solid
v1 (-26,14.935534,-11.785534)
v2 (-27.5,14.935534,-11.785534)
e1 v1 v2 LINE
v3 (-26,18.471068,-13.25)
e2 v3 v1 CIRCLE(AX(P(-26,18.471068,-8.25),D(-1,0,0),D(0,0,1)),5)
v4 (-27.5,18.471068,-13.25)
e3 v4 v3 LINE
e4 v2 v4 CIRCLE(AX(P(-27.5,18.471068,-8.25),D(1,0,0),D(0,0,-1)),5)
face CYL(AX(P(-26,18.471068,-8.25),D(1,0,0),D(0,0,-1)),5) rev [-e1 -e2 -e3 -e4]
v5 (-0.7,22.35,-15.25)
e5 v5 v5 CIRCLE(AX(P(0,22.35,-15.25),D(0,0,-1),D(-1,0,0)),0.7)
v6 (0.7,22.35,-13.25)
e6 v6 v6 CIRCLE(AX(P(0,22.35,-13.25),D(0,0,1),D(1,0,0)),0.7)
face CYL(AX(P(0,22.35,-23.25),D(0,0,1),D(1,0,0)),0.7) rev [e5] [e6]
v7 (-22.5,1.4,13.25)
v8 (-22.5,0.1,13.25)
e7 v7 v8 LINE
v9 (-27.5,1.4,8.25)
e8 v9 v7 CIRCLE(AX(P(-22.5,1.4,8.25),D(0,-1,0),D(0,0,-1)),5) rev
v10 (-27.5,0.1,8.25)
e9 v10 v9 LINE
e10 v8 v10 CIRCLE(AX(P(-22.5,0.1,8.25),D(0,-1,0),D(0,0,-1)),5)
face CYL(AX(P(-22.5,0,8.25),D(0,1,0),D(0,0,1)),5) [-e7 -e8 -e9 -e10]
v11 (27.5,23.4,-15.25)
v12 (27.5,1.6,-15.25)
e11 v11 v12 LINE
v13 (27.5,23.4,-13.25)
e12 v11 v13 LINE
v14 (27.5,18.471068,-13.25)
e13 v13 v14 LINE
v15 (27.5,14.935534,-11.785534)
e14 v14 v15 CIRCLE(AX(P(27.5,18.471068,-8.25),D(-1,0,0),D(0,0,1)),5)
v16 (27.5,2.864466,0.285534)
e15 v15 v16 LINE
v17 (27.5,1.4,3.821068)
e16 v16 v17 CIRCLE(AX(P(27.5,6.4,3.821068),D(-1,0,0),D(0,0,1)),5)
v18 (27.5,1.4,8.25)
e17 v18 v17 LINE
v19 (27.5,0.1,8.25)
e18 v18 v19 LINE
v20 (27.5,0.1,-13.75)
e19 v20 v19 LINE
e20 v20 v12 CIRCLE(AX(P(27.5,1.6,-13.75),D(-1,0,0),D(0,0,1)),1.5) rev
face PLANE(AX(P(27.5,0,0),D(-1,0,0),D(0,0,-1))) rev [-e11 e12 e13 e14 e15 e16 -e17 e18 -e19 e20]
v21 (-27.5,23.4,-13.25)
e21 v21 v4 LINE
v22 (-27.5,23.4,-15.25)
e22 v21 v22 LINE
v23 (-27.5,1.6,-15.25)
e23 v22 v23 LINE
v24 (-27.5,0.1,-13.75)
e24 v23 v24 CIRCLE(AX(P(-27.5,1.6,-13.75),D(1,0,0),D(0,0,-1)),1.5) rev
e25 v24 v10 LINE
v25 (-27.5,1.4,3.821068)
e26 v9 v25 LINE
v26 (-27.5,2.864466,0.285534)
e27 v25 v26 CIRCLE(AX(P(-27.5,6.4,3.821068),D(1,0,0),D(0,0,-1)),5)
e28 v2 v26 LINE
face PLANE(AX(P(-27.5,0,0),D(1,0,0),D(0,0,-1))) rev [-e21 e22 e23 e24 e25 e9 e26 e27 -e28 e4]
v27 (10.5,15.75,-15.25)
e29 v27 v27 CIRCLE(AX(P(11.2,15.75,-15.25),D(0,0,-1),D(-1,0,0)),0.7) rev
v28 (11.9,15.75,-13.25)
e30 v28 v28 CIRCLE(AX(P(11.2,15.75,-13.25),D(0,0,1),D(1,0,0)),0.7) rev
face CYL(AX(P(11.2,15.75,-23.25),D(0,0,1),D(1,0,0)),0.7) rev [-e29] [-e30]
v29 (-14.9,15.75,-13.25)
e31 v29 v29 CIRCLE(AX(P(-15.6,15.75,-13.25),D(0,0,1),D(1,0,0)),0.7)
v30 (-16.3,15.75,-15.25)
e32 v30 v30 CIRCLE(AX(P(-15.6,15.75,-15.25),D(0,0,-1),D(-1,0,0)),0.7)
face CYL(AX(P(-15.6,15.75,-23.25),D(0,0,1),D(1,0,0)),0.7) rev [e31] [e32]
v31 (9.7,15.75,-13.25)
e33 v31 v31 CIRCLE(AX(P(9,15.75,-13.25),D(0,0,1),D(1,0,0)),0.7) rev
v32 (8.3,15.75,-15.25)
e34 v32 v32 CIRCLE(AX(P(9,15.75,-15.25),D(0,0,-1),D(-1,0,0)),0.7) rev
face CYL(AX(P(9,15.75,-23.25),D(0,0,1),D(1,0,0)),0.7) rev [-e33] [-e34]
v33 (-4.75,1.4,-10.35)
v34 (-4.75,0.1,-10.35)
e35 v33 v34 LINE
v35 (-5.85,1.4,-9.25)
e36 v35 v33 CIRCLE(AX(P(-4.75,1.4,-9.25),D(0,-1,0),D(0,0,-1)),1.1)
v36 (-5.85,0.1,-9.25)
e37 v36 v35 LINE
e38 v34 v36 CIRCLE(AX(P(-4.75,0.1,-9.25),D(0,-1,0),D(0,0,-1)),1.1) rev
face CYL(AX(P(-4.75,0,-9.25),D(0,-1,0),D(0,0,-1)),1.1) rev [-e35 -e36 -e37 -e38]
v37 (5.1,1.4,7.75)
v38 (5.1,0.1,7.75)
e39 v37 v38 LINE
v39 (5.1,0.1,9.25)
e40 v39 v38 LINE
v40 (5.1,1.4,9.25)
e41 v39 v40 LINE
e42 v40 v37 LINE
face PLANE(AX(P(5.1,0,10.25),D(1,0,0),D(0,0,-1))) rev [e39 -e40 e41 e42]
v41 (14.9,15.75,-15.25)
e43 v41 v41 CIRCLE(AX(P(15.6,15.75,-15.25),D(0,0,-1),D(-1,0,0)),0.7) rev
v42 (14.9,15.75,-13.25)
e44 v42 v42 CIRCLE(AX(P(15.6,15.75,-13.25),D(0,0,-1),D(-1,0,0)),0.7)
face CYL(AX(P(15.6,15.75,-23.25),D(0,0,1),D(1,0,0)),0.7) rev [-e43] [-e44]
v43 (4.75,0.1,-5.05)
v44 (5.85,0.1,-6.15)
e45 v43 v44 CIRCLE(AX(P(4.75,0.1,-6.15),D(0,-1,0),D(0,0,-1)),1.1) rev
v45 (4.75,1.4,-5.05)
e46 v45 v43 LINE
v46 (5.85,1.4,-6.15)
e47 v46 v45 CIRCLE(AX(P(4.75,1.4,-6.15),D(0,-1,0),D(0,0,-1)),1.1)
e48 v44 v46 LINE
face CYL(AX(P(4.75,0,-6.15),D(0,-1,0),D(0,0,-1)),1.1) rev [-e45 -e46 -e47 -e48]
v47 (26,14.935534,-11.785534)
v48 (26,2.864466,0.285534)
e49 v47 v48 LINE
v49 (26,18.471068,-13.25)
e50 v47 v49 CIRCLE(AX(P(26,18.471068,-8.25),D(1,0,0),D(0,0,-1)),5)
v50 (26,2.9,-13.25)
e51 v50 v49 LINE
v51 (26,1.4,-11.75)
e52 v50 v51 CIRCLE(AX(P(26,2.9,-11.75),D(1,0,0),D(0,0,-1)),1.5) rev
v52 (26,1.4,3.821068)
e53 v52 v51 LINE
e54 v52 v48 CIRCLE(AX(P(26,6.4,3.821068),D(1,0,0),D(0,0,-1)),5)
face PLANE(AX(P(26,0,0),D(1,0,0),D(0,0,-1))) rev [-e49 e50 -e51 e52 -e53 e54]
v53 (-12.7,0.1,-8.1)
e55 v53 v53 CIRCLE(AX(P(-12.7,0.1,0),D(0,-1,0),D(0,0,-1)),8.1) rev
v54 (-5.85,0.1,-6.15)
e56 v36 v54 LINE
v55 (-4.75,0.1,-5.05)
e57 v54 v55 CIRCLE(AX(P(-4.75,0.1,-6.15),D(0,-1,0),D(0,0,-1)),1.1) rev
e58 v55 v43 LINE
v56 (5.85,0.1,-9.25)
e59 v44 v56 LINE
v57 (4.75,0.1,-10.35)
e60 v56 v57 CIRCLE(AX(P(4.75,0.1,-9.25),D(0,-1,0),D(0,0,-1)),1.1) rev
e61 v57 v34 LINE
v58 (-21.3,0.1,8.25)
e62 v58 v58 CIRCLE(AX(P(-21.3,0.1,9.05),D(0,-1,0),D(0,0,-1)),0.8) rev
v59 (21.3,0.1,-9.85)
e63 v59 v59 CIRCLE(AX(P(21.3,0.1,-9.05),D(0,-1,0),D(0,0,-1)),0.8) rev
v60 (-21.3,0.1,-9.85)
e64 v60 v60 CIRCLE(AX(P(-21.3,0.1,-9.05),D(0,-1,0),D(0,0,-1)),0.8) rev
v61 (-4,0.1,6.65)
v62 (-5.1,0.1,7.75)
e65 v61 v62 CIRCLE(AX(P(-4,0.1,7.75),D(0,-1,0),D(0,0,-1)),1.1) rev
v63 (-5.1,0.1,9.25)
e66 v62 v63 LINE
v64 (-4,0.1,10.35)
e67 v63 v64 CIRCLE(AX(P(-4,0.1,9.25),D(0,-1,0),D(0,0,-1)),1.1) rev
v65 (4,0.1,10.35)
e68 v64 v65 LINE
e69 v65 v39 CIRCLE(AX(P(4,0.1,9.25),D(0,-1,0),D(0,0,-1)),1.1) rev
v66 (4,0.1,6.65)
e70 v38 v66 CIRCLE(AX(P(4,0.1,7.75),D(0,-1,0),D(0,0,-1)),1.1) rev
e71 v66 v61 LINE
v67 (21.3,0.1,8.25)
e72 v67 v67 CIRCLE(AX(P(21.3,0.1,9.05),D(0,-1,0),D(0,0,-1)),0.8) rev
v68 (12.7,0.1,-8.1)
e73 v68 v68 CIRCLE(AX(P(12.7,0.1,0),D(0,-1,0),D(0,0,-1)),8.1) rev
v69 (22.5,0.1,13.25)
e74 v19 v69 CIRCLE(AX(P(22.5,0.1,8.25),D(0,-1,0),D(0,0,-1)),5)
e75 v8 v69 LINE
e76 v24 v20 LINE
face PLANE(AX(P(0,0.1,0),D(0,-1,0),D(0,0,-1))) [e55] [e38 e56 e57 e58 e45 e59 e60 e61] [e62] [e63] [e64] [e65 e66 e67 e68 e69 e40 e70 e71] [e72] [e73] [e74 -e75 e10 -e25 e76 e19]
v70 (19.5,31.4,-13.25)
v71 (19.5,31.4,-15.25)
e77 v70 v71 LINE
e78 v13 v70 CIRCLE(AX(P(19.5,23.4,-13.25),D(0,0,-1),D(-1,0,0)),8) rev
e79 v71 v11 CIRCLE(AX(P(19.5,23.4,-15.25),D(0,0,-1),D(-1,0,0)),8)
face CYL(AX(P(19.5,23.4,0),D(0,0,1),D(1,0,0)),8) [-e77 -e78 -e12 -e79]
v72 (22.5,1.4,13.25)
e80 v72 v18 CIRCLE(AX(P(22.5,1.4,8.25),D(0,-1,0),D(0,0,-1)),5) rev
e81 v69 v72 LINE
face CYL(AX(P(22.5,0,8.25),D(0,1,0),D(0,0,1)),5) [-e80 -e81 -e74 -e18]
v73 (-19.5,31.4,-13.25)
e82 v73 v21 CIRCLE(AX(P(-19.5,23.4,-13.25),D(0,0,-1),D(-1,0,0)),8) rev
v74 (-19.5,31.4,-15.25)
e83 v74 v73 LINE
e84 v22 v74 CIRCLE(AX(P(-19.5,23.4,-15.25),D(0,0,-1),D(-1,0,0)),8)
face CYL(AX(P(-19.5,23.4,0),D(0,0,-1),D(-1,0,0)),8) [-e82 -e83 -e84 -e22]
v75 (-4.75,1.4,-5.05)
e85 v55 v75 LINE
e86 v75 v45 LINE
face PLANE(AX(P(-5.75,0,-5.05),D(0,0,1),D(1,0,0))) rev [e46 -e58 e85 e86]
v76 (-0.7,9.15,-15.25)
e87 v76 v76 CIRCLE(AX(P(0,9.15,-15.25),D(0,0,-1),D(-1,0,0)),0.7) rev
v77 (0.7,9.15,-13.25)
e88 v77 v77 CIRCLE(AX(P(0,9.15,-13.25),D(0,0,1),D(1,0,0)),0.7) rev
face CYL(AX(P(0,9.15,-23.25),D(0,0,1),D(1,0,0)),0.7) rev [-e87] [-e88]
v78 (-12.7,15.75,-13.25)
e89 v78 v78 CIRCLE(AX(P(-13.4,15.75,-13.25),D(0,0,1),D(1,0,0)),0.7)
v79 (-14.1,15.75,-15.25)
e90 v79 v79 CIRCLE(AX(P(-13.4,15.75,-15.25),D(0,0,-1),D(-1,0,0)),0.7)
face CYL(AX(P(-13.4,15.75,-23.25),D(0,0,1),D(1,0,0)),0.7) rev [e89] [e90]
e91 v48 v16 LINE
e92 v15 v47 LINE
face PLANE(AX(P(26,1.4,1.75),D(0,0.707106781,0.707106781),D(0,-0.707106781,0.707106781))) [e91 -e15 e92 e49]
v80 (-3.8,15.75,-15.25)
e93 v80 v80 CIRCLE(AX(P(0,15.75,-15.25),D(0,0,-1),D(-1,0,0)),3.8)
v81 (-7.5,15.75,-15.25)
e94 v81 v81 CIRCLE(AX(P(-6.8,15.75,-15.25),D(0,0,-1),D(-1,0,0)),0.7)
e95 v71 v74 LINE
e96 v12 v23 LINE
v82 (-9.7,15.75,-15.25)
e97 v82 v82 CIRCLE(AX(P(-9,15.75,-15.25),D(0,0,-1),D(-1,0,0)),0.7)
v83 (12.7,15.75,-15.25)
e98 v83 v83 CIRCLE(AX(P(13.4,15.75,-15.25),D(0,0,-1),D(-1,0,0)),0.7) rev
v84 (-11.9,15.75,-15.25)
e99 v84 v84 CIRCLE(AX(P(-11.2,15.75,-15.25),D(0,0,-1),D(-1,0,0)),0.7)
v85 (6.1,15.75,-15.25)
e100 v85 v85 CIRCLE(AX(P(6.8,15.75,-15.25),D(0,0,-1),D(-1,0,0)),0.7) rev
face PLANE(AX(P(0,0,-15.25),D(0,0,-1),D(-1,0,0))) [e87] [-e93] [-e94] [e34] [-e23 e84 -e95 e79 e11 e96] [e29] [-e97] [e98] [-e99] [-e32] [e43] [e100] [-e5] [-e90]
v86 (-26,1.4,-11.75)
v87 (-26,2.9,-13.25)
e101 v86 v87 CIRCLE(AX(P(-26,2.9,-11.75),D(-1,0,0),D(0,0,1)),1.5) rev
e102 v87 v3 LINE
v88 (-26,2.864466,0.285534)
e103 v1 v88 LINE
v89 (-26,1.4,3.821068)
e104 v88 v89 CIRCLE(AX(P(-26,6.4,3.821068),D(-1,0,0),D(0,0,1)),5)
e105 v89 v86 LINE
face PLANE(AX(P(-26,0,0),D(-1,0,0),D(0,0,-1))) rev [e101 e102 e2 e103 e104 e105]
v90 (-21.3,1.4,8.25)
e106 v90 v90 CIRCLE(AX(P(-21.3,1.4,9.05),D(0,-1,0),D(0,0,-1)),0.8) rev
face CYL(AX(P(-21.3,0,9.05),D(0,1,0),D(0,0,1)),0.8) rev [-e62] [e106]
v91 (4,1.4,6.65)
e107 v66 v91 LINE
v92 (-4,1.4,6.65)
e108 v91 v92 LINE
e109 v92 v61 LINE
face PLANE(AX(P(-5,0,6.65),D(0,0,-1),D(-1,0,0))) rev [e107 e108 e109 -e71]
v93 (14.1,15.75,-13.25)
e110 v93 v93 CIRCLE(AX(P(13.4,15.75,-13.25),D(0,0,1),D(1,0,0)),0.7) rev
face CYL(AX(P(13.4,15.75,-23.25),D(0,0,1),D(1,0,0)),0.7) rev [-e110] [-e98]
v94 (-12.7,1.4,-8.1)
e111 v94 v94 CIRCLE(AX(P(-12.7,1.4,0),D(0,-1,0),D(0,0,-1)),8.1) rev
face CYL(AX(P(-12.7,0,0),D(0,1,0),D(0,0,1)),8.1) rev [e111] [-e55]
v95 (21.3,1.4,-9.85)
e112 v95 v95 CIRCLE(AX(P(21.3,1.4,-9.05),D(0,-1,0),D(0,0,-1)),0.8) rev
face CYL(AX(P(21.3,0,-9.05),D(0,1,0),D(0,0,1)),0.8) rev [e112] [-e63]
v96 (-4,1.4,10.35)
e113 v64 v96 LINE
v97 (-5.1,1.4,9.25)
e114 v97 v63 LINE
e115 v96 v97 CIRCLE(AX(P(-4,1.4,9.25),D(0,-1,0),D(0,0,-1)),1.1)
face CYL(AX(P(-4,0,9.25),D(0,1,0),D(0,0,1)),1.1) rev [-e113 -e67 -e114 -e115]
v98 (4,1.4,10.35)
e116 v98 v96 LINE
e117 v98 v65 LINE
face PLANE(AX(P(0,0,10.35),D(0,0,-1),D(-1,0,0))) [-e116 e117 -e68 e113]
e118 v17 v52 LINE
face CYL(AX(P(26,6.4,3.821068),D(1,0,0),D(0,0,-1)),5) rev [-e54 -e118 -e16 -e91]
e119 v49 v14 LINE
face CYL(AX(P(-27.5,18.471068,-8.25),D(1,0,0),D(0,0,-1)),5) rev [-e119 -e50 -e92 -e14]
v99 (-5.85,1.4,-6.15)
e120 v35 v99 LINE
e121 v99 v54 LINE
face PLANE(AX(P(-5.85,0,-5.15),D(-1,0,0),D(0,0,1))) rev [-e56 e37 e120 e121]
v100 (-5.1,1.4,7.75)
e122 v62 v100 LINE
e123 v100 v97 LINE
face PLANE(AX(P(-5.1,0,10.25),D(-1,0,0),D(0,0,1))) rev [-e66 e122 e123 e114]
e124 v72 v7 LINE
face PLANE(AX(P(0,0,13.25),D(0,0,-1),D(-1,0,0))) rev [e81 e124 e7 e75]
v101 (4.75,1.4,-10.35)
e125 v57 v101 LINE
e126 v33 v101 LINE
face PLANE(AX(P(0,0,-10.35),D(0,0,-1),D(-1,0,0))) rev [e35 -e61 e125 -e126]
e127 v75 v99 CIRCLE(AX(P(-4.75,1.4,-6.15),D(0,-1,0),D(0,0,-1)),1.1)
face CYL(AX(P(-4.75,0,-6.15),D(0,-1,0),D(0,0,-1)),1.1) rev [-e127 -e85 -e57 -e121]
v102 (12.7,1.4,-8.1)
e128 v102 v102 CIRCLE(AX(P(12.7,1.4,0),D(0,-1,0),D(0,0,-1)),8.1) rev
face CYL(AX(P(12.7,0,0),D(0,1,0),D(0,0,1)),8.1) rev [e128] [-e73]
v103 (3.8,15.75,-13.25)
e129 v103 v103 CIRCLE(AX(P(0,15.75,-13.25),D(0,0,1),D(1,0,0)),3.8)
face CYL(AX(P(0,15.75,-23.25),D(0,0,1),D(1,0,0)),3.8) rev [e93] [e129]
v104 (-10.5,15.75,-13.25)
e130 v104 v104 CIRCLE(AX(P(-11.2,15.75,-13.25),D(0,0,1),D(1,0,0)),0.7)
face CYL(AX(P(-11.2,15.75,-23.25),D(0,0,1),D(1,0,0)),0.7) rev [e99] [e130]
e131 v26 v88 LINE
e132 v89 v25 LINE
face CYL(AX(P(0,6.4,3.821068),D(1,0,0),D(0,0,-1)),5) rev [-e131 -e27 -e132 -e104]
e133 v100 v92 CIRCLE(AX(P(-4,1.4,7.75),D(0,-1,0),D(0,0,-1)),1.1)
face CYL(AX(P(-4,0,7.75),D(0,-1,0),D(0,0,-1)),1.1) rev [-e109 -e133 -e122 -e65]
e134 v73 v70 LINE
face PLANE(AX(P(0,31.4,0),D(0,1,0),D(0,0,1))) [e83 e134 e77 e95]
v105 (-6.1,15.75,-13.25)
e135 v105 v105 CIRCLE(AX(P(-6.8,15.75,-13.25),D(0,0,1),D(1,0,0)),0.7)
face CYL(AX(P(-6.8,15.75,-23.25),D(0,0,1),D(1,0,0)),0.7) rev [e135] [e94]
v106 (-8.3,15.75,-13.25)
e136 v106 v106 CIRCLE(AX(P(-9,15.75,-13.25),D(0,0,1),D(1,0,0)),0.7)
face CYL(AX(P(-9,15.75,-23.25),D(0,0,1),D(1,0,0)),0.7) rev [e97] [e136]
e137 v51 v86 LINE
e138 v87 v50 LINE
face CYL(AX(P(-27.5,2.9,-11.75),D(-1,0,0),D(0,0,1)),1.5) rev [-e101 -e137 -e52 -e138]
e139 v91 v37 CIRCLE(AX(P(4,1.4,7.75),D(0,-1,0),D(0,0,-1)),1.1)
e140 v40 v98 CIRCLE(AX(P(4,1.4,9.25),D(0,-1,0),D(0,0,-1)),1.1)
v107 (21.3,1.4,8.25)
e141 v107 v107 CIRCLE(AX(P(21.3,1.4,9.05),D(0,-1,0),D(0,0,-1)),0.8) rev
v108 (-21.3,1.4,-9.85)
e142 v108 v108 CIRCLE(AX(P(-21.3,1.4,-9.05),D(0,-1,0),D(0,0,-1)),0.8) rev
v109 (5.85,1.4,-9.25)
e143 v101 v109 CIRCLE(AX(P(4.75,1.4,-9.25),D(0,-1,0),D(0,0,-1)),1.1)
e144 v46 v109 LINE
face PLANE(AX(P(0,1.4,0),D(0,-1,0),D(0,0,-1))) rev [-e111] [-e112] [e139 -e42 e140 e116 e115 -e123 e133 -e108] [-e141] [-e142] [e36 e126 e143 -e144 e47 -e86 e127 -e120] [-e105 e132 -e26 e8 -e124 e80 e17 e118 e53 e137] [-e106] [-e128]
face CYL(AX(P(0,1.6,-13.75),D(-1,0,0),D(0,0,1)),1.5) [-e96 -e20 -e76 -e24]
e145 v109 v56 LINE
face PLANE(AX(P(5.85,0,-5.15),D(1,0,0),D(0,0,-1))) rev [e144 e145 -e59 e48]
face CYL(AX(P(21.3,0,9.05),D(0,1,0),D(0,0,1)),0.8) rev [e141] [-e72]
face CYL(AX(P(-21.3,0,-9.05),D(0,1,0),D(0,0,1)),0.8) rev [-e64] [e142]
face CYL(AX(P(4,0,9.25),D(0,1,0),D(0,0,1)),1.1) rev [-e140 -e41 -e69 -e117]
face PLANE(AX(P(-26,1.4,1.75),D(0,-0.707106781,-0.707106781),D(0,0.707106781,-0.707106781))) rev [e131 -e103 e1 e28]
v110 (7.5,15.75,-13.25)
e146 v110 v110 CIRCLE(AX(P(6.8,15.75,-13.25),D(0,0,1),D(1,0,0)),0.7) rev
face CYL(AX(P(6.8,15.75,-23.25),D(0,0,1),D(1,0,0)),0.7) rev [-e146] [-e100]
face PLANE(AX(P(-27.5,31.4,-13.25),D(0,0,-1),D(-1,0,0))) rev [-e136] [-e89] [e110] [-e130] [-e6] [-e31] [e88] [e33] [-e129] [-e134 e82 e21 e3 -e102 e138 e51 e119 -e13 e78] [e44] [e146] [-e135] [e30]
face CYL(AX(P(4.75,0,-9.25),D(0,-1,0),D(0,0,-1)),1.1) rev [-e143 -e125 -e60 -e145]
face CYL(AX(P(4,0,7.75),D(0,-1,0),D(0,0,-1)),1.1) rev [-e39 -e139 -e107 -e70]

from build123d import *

# Parameters (mm, degrees)
SKETCH1_W                = 45
SKETCH1_H                = 20.5
BOSS_EXTRUDE1_DEPTH      = 1.5
SKETCH2_R                = 0.7
CUT_EXTRUDE1_DEPTH       = 1.5
SKETCH3_R                = 8
CUT_EXTRUDE2_DEPTH       = 1.5
SKETCH4_W                = 10
SKETCH4_H                = 3.5
SKETCH4_W_2              = 11.5
SKETCH4_H_2              = 5.1
CUT_EXTRUDE3_DEPTH       = 1.5
SKETCH5_W                = 45
SKETCH5_H                = 1.5
BOSS_EXTRUDE2_DEPTH      = 5
SKETCH6_W                = 45
SKETCH6_H                = 1.5
BOSS_EXTRUDE3_DEPTH      = 3
FILLET1_R                = 1
MOVE_FACE1_OUTLINE_W     = 45
MOVE_FACE1_OUTLINE_H     = 28.5
MOVE_FACE1_OUTLINE_R     = 0.7
MOVE_FACE1_OUTLINE_R_2   = 8
MOVE_FACE1_DEPTH         = 0.1
MOVE_START               = 1.4
MOVE_FACE1_2_OUTLINE_W   = 45
MOVE_FACE1_2_OUTLINE_H   = 28.5
MOVE_FACE1_2_OUTLINE_R   = 0.7
MOVE_FACE1_2_OUTLINE_R_2 = 8
MOVE_FACE1_2_DEPTH       = 0.1
MOVE_START_2             = 0.1
MOVE_FACE1_3_OUTLINE_R   = 0.8
MOVE_FACE1_3_OUTLINE_R_2 = 0.7
MOVE_FACE1_3_OUTLINE_R_3 = 8.1
MOVE_FACE1_3_OUTLINE_R_4 = 8
MOVE_FACE1_3_DEPTH       = 1.3
SKETCH7_W                = 28.5
SKETCH7_H                = 1.3
BOSS_EXTRUDE4_DEPTH      = 5
SKETCH8_W                = 55
SKETCH8_H                = 2
BOSS_EXTRUDE5_DEPTH      = 30
BOSS_EXTRUDE6_DEPTH      = 1.5
SKETCH11_R               = 3.8
CUT_EXTRUDE4_DEPTH       = 10
SKETCH13_R               = 0.7
CUT_EXTRUDE5_DEPTH       = 10
FILLET2_R                = 5
FILLET3_R                = 8
FILLET4_R                = 1.5


# Read off the part's stored shape, not the designer's step: Move Face1
with BuildPart() as part:
    # Sketch1 → Boss-Extrude1 (new body)
    with BuildSketch(Plane(origin=(0, 0, 0), x_dir=(1, 0, 0), z_dir=(0, 1, 0))):
        Rectangle(SKETCH1_W, SKETCH1_H)
    extrude(amount=BOSS_EXTRUDE1_DEPTH)

    # Sketch2 → Cut-Extrude1 (cut)
    with BuildSketch(Plane(origin=(0, 1.5, 0), x_dir=(1, 0, 0), z_dir=(0, 1, 0))):
        with Locations(Location((-21.3, 9.05, 0), (0, 0, 270))):
            Circle(SKETCH2_R)
        with Locations(Location((21.3, 9.05, 0), (0, 0, 90))):
            Circle(SKETCH2_R)
        with Locations(Location((21.3, -9.05, 0), (0, 0, 270))):
            Circle(SKETCH2_R)
        with Locations(Location((-21.3, -9.05, 0), (0, 0, 90))):
            Circle(SKETCH2_R)
    extrude(amount=-CUT_EXTRUDE1_DEPTH, mode=Mode.SUBTRACT)

    # Sketch3 → Cut-Extrude2 (cut)
    with BuildSketch(Plane(origin=(0, 1.5, 0), x_dir=(1, 0, 0), z_dir=(0, 1, 0))):
        with Locations(Location((12.7, 0, 0), (0, 0, 270))):
            Circle(SKETCH3_R)
        with Locations(Location((-12.7, 0, 0), (0, 0, 90))):
            Circle(SKETCH3_R)
    extrude(amount=-CUT_EXTRUDE2_DEPTH, mode=Mode.SUBTRACT)

    # Sketch4 → Cut-Extrude3 (cut)
    with BuildSketch(Plane(origin=(0, 1.5, 0), x_dir=(1, 0, 0), z_dir=(0, 1, 0))):
        with Locations((0, -8.5)):
            Rectangle(SKETCH4_W, SKETCH4_H)
        with Locations((0, 7.7)):
            Rectangle(SKETCH4_W_2, SKETCH4_H_2)
    extrude(amount=-CUT_EXTRUDE3_DEPTH, mode=Mode.SUBTRACT)

    # Sketch5 → Boss-Extrude2 (add)
    with BuildSketch(Plane(origin=(0, 0, -10.25), x_dir=(-1, 0, 0), z_dir=(0, 0, -1))):
        with Locations((0, 0.75)):
            Rectangle(SKETCH5_W, SKETCH5_H)
    extrude(amount=BOSS_EXTRUDE2_DEPTH)

    # Sketch6 → Boss-Extrude3 (add)
    with BuildSketch(Plane.XY.offset(10.25)):
        with Locations((0, 0.75)):
            Rectangle(SKETCH6_W, SKETCH6_H)
    extrude(amount=BOSS_EXTRUDE3_DEPTH)

    # Fillet1
    fillet1_edges = [part.edges().sort_by_distance(p)[0] for p in [
        (5, 0.75, 6.75),
        (5, 0.75, 10.25),
        (-5, 0.75, 10.25),
        (-5, 0.75, 6.75),
        (5.75, 0.75, -10.25),
        (5.75, 0.75, -5.15),
        (-5.75, 0.75, -5.15),
        (-5.75, 0.75, -10.25),
    ]]
    fillet(fillet1_edges, radius=FILLET1_R)

    # Move Face1 outline → Move Face1 (cut)
    with BuildSketch(Plane(origin=(0, 0, 0), x_dir=(1, 0, 0), z_dir=(0, 1, 0))):
        with Locations((0, 1)):
            Rectangle(MOVE_FACE1_OUTLINE_W, MOVE_FACE1_OUTLINE_H)
        with Locations((-21.3, 9.05)):
            Circle(MOVE_FACE1_OUTLINE_R, mode=Mode.SUBTRACT)
        with Locations((-21.3, -9.05)):
            Circle(MOVE_FACE1_OUTLINE_R, mode=Mode.SUBTRACT)
        with Locations((-12.7, 0)):
            Circle(MOVE_FACE1_OUTLINE_R_2, mode=Mode.SUBTRACT)
        with BuildLine():
            Line((5, -7.75), (5, -9.25))
            ThreePointArc((5, -9.25), (4.707106781, -9.957106781), (4, -10.25))
            Line((4, -10.25), (-4, -10.25))
            ThreePointArc((-4, -10.25), (-4.707106781, -9.957106781), (-5, -9.25))
            Line((-5, -9.25), (-5, -7.75))
            ThreePointArc((-5, -7.75), (-4.707106781, -7.042893219), (-4, -6.75))
            Line((-4, -6.75), (4, -6.75))
            ThreePointArc((4, -6.75), (4.707106781, -7.042893219), (5, -7.75))
        make_face(mode=Mode.SUBTRACT)
        with Locations((21.3, -9.05)):
            Circle(MOVE_FACE1_OUTLINE_R, mode=Mode.SUBTRACT)
        with Locations((12.7, 0)):
            Circle(MOVE_FACE1_OUTLINE_R_2, mode=Mode.SUBTRACT)
        with Locations((21.3, 9.05)):
            Circle(MOVE_FACE1_OUTLINE_R, mode=Mode.SUBTRACT)
        with BuildLine():
            Line((5.75, 9.25), (5.75, 6.15))
            ThreePointArc((5.75, 6.15), (5.457106781, 5.442893219), (4.75, 5.15))
            Line((4.75, 5.15), (-4.75, 5.15))
            ThreePointArc((-4.75, 5.15), (-5.457106781, 5.442893219), (-5.75, 6.15))
            Line((-5.75, 6.15), (-5.75, 9.25))
            ThreePointArc((-5.75, 9.25), (-5.457106781, 9.957106781), (-4.75, 10.25))
            Line((-4.75, 10.25), (4.75, 10.25))
            ThreePointArc((4.75, 10.25), (5.457106781, 9.957106781), (5.75, 9.25))
        make_face(mode=Mode.SUBTRACT)
    extrude(amount=MOVE_FACE1_DEPTH, mode=Mode.SUBTRACT)

    # Move Face1 2 outline → Move Face1 2 (cut)
    with BuildSketch(Plane(origin=(0, 0, 0), x_dir=(1, 0, 0), z_dir=(0, 1, 0)).offset(MOVE_START)):
        with Locations((0, 1)):
            Rectangle(MOVE_FACE1_2_OUTLINE_W, MOVE_FACE1_2_OUTLINE_H)
        with Locations((-21.3, 9.05)):
            Circle(MOVE_FACE1_2_OUTLINE_R, mode=Mode.SUBTRACT)
        with Locations((-21.3, -9.05)):
            Circle(MOVE_FACE1_2_OUTLINE_R, mode=Mode.SUBTRACT)
        with Locations((-12.7, 0)):
            Circle(MOVE_FACE1_2_OUTLINE_R_2, mode=Mode.SUBTRACT)
        with BuildLine():
            Line((5, -7.75), (5, -9.25))
            ThreePointArc((5, -9.25), (4.707106781, -9.957106781), (4, -10.25))
            Line((4, -10.25), (-4, -10.25))
            ThreePointArc((-4, -10.25), (-4.707106781, -9.957106781), (-5, -9.25))
            Line((-5, -9.25), (-5, -7.75))
            ThreePointArc((-5, -7.75), (-4.707106781, -7.042893219), (-4, -6.75))
            Line((-4, -6.75), (4, -6.75))
            ThreePointArc((4, -6.75), (4.707106781, -7.042893219), (5, -7.75))
        make_face(mode=Mode.SUBTRACT)
        with Locations((21.3, -9.05)):
            Circle(MOVE_FACE1_2_OUTLINE_R, mode=Mode.SUBTRACT)
        with Locations((12.7, 0)):
            Circle(MOVE_FACE1_2_OUTLINE_R_2, mode=Mode.SUBTRACT)
        with Locations((21.3, 9.05)):
            Circle(MOVE_FACE1_2_OUTLINE_R, mode=Mode.SUBTRACT)
        with BuildLine():
            Line((5.75, 9.25), (5.75, 6.15))
            ThreePointArc((5.75, 6.15), (5.457106781, 5.442893219), (4.75, 5.15))
            Line((4.75, 5.15), (-4.75, 5.15))
            ThreePointArc((-4.75, 5.15), (-5.457106781, 5.442893219), (-5.75, 6.15))
            Line((-5.75, 6.15), (-5.75, 9.25))
            ThreePointArc((-5.75, 9.25), (-5.457106781, 9.957106781), (-4.75, 10.25))
            Line((-4.75, 10.25), (4.75, 10.25))
            ThreePointArc((4.75, 10.25), (5.457106781, 9.957106781), (5.75, 9.25))
        make_face(mode=Mode.SUBTRACT)
    extrude(amount=MOVE_FACE1_2_DEPTH, mode=Mode.SUBTRACT)

    # Move Face1 3 outline → Move Face1 3 (cut)
    # profile 1 of 8: a face of its own
    with BuildSketch(Plane(origin=(0, 0, 0), x_dir=(1, 0, 0), z_dir=(0, 1, 0)).offset(MOVE_START_2)):
        with Locations((-21.3, 9.05)):
            Circle(MOVE_FACE1_3_OUTLINE_R)
        with Locations((-21.3, 9.05)):
            Circle(MOVE_FACE1_3_OUTLINE_R_2, mode=Mode.SUBTRACT)
    # profile 2 of 8: a face of its own
    with BuildSketch(Plane(origin=(0, 0, 0), x_dir=(1, 0, 0), z_dir=(0, 1, 0)).offset(MOVE_START_2)):
        with Locations((21.3, 9.05)):
            Circle(MOVE_FACE1_3_OUTLINE_R)
        with Locations((21.3, 9.05)):
            Circle(MOVE_FACE1_3_OUTLINE_R_2, mode=Mode.SUBTRACT)
    # profile 3 of 8: a face of its own
    with BuildSketch(Plane(origin=(0, 0, 0), x_dir=(1, 0, 0), z_dir=(0, 1, 0)).offset(MOVE_START_2)):
        with Locations((21.3, -9.05)):
            Circle(MOVE_FACE1_3_OUTLINE_R)
        with Locations((21.3, -9.05)):
            Circle(MOVE_FACE1_3_OUTLINE_R_2, mode=Mode.SUBTRACT)
    # profile 4 of 8: a face of its own
    with BuildSketch(Plane(origin=(0, 0, 0), x_dir=(1, 0, 0), z_dir=(0, 1, 0)).offset(MOVE_START_2)):
        with Locations((-21.3, -9.05)):
            Circle(MOVE_FACE1_3_OUTLINE_R)
        with Locations((-21.3, -9.05)):
            Circle(MOVE_FACE1_3_OUTLINE_R_2, mode=Mode.SUBTRACT)
    # profile 5 of 8: a face of its own
    with BuildSketch(Plane(origin=(0, 0, 0), x_dir=(1, 0, 0), z_dir=(0, 1, 0)).offset(MOVE_START_2)):
        with Locations((-12.7, 0)):
            Circle(MOVE_FACE1_3_OUTLINE_R_3)
        with Locations((-12.7, 0)):
            Circle(MOVE_FACE1_3_OUTLINE_R_4, mode=Mode.SUBTRACT)
    # profile 6 of 8: a face of its own
    with BuildSketch(Plane(origin=(0, 0, 0), x_dir=(1, 0, 0), z_dir=(0, 1, 0)).offset(MOVE_START_2)):
        with Locations((12.7, 0)):
            Circle(MOVE_FACE1_3_OUTLINE_R_3)
        with Locations((12.7, 0)):
            Circle(MOVE_FACE1_3_OUTLINE_R_4, mode=Mode.SUBTRACT)
    # profile 7 of 8: a face of its own
    with BuildSketch(Plane(origin=(0, 0, 0), x_dir=(1, 0, 0), z_dir=(0, 1, 0)).offset(MOVE_START_2)):
        with BuildLine():
            ThreePointArc((4.75, 5.05), (5.527817459, 5.372182541), (5.85, 6.15))
            Line((5.85, 6.15), (5.85, 9.25))
            ThreePointArc((5.85, 9.25), (5.527817459, 10.027817459), (4.75, 10.35))
            Line((4.75, 10.35), (-4.75, 10.35))
            ThreePointArc((-4.75, 10.35), (-5.527817459, 10.027817459), (-5.85, 9.25))
            Line((-5.85, 9.25), (-5.85, 6.15))
            ThreePointArc((-5.85, 6.15), (-5.527817459, 5.372182541), (-4.75, 5.05))
            Line((-4.75, 5.05), (4.75, 5.05))
        make_face()
        with BuildLine():
            Line((5.75, 9.25), (5.75, 6.15))
            ThreePointArc((5.75, 6.15), (5.457106781, 5.442893219), (4.75, 5.15))
            Line((4.75, 5.15), (-4.75, 5.15))
            ThreePointArc((-4.75, 5.15), (-5.457106781, 5.442893219), (-5.75, 6.15))
            Line((-5.75, 6.15), (-5.75, 9.25))
            ThreePointArc((-5.75, 9.25), (-5.457106781, 9.957106781), (-4.75, 10.25))
            Line((-4.75, 10.25), (4.75, 10.25))
            ThreePointArc((4.75, 10.25), (5.457106781, 9.957106781), (5.75, 9.25))
        make_face(mode=Mode.SUBTRACT)
    # profile 8 of 8: a face of its own
    with BuildSketch(Plane(origin=(0, 0, 0), x_dir=(1, 0, 0), z_dir=(0, 1, 0)).offset(MOVE_START_2)):
        with BuildLine():
            ThreePointArc((4, -10.35), (4.777817459, -10.027817459), (5.1, -9.25))
            Line((5.1, -9.25), (5.1, -7.75))
            ThreePointArc((5.1, -7.75), (4.777817459, -6.972182541), (4, -6.65))
            Line((4, -6.65), (-4, -6.65))
            ThreePointArc((-4, -6.65), (-4.777817459, -6.972182541), (-5.1, -7.75))
            Line((-5.1, -7.75), (-5.1, -9.25))
            ThreePointArc((-5.1, -9.25), (-4.777817459, -10.027817459), (-4, -10.35))
            Line((-4, -10.35), (4, -10.35))
        make_face()
        with BuildLine():
            Line((5, -7.75), (5, -9.25))
            ThreePointArc((5, -9.25), (4.707106781, -9.957106781), (4, -10.25))
            Line((4, -10.25), (-4, -10.25))
            ThreePointArc((-4, -10.25), (-4.707106781, -9.957106781), (-5, -9.25))
            Line((-5, -9.25), (-5, -7.75))
            ThreePointArc((-5, -7.75), (-4.707106781, -7.042893219), (-4, -6.75))
            Line((-4, -6.75), (4, -6.75))
            ThreePointArc((4, -6.75), (4.707106781, -7.042893219), (5, -7.75))
        make_face(mode=Mode.SUBTRACT)
    extrude(amount=MOVE_FACE1_3_DEPTH, mode=Mode.SUBTRACT)

    # Sketch7 → Boss-Extrude4 (add)
    with BuildSketch(Plane.ZY.offset(22.5)):
        with Locations((-1, 0.75)):
            Rectangle(SKETCH7_W, SKETCH7_H)
    boss_extrude4 = extrude(amount=BOSS_EXTRUDE4_DEPTH)

    # Mirror1: Boss-Extrude4 across plane
    add(boss_extrude4.mirror(Plane(origin=(0, 0, 0), x_dir=(0, 0, 1), z_dir=(1, 0, 0))))

    # Sketch8 → Boss-Extrude5 (add)
    with BuildSketch(Plane(origin=(0, 1.4, 0), x_dir=(1, 0, 0), z_dir=(0, 1, 0))):
        with Locations((0, 14.25)):
            Rectangle(SKETCH8_W, SKETCH8_H)
    extrude(amount=BOSS_EXTRUDE5_DEPTH)

    # Sketch9 → Boss-Extrude6 (add)
    with BuildSketch(Plane(origin=(27.5, 0, 0), x_dir=(0, 0, -1), z_dir=(1, 0, 0))):
        Polygon((-1.75, 1.4), (13.25, 16.4), (13.25, 1.4), align=None)
    boss_extrude6 = extrude(amount=-BOSS_EXTRUDE6_DEPTH)

    # Mirror2: Boss-Extrude6 across plane
    add(boss_extrude6.mirror(Plane(origin=(0, 0, 0), x_dir=(0, 0, 1), z_dir=(1, 0, 0))))

    # Sketch11 → Cut-Extrude4 (cut)
    with BuildSketch(Plane.XY.offset(-13.25)):
        with Locations((0, 15.75)):
            Circle(SKETCH11_R)
    extrude(amount=-CUT_EXTRUDE4_DEPTH, mode=Mode.SUBTRACT)

    # Sketch13 → Cut-Extrude5 (cut)
    with BuildSketch(Plane.XY.offset(-13.25)):
        with Locations((-6.8, 15.75)):
            Circle(SKETCH13_R)
        with Locations((-9, 15.75)):
            Circle(SKETCH13_R)
        with Locations((-11.2, 15.75)):
            Circle(SKETCH13_R)
        with Locations((-13.4, 15.75)):
            Circle(SKETCH13_R)
        with Locations((-15.6, 15.75)):
            Circle(SKETCH13_R)
        with Locations((0, 22.35)):
            Circle(SKETCH13_R)
        with Locations((0, 9.15)):
            Circle(SKETCH13_R)
        with Locations(Location((15.6, 15.75, 0), (0, 0, 180))):
            Circle(SKETCH13_R)
        with Locations((13.4, 15.75)):
            Circle(SKETCH13_R)
        with Locations((11.2, 15.75)):
            Circle(SKETCH13_R)
        with Locations((9, 15.75)):
            Circle(SKETCH13_R)
        with Locations((6.8, 15.75)):
            Circle(SKETCH13_R)
    extrude(amount=-CUT_EXTRUDE5_DEPTH, mode=Mode.SUBTRACT)

    # Fillet2
    fillet2_edges = [part.edges().sort_by_distance(p)[0] for p in [
        (-27.5, 0.75, 13.25),
        (27.5, 0.75, 13.25),
        (26.75, 1.4, 1.75),
        (26.75, 16.4, -13.25),
        (-26.75, 1.4, 1.75),
        (-26.75, 16.4, -13.25),
    ]]
    fillet(fillet2_edges, radius=FILLET2_R)

    # Fillet3
    fillet3_edges = [part.edges().sort_by_distance(p)[0] for p in [
        (-27.5, 31.4, -14.25),
        (27.5, 31.4, -14.25),
    ]]
    fillet(fillet3_edges, radius=FILLET3_R)

    # Fillet4
    fillet4_edges = [part.edges().sort_by_distance(p)[0] for p in [
        (0, 1.4, -13.25),
        (0, 0.1, -15.25),
    ]]
    fillet(fillet4_edges, radius=FILLET4_R)


solid = part.part
